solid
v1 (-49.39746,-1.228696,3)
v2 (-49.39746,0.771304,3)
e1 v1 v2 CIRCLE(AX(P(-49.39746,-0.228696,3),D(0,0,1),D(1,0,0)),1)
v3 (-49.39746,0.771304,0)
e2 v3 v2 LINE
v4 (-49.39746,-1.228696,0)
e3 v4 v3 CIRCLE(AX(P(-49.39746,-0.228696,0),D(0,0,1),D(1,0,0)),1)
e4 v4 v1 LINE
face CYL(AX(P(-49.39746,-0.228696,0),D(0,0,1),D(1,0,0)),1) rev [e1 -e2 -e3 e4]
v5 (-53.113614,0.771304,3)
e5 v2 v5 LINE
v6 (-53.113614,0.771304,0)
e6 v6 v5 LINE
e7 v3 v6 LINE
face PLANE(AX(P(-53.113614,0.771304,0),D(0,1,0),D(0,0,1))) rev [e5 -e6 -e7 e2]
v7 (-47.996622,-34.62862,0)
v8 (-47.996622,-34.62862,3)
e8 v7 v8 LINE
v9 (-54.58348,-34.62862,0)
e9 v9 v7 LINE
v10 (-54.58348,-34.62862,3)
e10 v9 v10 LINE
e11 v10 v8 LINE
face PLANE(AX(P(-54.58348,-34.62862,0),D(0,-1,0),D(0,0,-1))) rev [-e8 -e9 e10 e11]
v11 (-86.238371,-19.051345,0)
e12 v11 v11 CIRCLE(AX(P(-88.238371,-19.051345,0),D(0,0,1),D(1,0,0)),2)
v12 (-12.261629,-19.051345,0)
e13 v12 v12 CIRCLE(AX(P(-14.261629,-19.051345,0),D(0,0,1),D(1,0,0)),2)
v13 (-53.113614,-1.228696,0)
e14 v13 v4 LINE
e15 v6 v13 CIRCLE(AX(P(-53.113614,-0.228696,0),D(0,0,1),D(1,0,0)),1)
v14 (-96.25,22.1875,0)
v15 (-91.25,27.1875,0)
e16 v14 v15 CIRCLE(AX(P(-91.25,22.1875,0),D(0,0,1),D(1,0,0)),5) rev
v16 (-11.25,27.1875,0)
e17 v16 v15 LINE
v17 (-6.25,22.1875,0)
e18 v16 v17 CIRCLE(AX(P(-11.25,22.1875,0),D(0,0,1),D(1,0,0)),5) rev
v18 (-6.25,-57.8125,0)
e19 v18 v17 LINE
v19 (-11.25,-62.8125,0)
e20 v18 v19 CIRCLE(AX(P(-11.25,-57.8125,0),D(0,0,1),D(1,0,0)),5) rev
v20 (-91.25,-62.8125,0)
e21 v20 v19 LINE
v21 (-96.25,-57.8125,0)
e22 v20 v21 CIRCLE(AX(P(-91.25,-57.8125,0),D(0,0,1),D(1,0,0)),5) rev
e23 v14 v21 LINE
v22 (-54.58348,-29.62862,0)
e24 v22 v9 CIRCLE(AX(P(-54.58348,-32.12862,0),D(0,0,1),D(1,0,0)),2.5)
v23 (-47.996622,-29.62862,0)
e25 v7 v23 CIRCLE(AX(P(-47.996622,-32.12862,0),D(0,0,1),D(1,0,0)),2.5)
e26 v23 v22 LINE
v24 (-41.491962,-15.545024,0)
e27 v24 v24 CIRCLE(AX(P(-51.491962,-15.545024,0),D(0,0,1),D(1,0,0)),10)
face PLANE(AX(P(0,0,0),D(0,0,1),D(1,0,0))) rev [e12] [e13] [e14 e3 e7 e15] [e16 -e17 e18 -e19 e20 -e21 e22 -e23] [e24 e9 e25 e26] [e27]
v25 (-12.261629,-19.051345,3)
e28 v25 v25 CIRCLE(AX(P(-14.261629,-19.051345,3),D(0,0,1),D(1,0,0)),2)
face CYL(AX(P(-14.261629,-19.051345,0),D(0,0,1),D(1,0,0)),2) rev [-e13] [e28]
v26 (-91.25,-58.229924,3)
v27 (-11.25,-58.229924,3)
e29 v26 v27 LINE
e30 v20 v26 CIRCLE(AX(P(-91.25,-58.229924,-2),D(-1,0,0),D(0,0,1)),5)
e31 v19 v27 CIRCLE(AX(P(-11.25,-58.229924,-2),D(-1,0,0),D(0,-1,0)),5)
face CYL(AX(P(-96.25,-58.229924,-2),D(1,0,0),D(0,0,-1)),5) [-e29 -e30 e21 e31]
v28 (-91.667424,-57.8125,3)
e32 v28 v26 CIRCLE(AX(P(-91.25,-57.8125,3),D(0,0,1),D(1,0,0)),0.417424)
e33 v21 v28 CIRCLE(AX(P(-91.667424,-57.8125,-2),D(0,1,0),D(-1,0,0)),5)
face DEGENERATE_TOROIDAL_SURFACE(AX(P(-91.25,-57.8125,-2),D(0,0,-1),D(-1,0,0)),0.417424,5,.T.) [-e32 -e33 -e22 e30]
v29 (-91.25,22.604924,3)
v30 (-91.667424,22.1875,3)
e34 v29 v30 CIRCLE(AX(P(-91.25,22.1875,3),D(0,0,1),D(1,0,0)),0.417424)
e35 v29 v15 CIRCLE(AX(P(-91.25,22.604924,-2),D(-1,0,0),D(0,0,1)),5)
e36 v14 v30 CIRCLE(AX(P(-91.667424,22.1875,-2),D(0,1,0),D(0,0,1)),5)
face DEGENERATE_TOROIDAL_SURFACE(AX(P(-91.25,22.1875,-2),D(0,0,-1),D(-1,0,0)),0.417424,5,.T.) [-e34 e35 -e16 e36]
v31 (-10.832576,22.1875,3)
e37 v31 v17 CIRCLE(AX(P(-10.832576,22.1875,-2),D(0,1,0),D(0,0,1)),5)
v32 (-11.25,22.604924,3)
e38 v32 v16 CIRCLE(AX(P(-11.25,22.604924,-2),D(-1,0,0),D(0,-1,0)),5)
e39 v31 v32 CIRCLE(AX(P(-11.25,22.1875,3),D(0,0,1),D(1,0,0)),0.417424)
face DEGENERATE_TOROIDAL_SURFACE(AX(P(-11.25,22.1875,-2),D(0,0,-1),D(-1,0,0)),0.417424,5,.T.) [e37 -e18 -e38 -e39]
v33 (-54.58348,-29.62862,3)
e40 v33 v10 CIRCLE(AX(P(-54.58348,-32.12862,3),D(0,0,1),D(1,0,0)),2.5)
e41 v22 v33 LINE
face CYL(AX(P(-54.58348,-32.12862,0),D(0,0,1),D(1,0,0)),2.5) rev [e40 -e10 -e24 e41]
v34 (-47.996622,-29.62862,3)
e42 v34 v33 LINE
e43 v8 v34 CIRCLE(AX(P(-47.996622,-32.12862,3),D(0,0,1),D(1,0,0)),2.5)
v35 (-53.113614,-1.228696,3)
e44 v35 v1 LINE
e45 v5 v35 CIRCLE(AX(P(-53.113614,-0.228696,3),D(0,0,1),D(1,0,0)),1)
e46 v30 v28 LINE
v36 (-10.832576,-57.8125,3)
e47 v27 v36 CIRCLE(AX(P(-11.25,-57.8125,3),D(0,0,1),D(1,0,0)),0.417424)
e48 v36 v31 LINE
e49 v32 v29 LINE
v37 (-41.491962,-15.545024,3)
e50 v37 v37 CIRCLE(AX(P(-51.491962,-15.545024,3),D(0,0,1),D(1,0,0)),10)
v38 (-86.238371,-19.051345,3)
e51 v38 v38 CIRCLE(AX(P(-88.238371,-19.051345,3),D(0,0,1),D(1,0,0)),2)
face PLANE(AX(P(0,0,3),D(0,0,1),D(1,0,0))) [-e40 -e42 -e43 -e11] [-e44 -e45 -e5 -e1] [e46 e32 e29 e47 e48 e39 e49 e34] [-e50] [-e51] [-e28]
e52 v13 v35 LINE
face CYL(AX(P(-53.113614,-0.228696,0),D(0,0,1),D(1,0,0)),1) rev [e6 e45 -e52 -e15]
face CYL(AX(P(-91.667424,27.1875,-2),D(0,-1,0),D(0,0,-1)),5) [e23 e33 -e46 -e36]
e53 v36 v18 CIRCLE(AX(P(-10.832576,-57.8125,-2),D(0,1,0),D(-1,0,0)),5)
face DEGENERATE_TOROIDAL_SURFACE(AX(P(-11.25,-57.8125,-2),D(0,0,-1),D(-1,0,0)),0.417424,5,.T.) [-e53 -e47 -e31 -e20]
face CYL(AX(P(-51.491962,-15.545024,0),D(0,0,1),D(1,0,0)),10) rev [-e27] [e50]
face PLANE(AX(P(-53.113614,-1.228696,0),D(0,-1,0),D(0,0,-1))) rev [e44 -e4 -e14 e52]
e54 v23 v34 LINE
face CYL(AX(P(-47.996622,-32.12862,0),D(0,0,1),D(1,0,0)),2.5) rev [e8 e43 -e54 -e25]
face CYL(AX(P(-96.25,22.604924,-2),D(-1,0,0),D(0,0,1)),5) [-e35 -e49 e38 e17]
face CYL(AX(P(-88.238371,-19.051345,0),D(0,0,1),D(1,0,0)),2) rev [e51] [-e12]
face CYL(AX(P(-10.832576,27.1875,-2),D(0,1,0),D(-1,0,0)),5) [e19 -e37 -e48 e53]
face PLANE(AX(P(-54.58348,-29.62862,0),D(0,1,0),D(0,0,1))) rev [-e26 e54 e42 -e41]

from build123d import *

# Parameters (mm, degrees)
SKETCH1_W           = 90
SKETCH1_H           = 90
BOSS_EXTRUDE1_DEPTH = 3
FILLET1_R           = 5
FILLET3_R           = 5
SKETCH2_R           = 10
SKETCH2_R_2         = 2
CUT_EXTRUDE1_DEPTH  = 3


with BuildPart() as part:
    # Sketch1 → Boss-Extrude1 (new body)
    with BuildSketch(Plane.XY):
        with Locations((-51.25, -17.8125)):
            Rectangle(SKETCH1_W, SKETCH1_H)
    extrude(amount=BOSS_EXTRUDE1_DEPTH)

    # Fillet1
    fillet1_edges = [part.edges().sort_by_distance(p)[0] for p in [
        (-96.25, 27.1875, 1.5),
        (-6.25, 27.1875, 1.5),
        (-6.25, -62.8125, 1.5),
        (-96.25, -62.8125, 1.5),
    ]]
    fillet(fillet1_edges, radius=FILLET1_R)

    # Fillet3
    # the kernel refuses this fillet: 5 mm, written as the material it takes off along each edge
    with BuildSketch(Plane(origin=(-91.25, 22.1875, 3), x_dir=(0, 1, 0), z_dir=(1, 0, 0))) as fillet3_piece_1:
        with BuildLine():
            CenterArc((0.417424305, -5), FILLET3_R, 23.578178478, 66.421821522)
            Line((0.417424305, 0), (0.417424305, 0.1))
            Line((0.417424305, 0.1), (5, 0.1))
            Line((5, 0.1), (5.1, 0))
            ThreePointArc((5.1, 0), (5.1, -1.5), (5.091651514, -2.96))
            Line((5.091651514, -2.96), (5, -3))
        make_face()
    revolve(axis=Axis((-91.25, 22.1875, 3), (0, 0, 1)), revolution_arc=90, mode=Mode.SUBTRACT)
    with BuildSketch(Plane(origin=(-91.25, 27.1875, 3), x_dir=(0, 0, -1), z_dir=(1, 0, 0))) as fillet3_piece_2:
        with BuildLine():
            CenterArc((5, -4.582575695), FILLET3_R, 113.578178478, 66.421821522)
            Line((0, -4.582575695), (-0.1, -4.582575695))
            Line((-0.1, -4.582575695), (-0.1, 0))
            Line((-0.1, 0), (0, 0.1))
            ThreePointArc((0, 0.1), (1.5, 0.1), (2.96, 0.091651514))
            Line((2.96, 0.091651514), (3, 0))
        make_face()
    extrude(amount=80, mode=Mode.SUBTRACT)
    with BuildSketch(Plane(origin=(-11.25, 22.1875, 3), x_dir=(0, 1, 0), z_dir=(-1, 0, 0))) as fillet3_piece_3:
        with BuildLine():
            CenterArc((0.417424305, 5), FILLET3_R, 270, 66.421821522)
            Line((0.417424305, 0), (0.417424305, -0.1))
            Line((0.417424305, -0.1), (5, -0.1))
            Line((5, -0.1), (5.1, 0))
            ThreePointArc((5.1, 0), (5.1, 1.5), (5.091651514, 2.96))
            Line((5.091651514, 2.96), (5, 3))
        make_face()
    revolve(axis=Axis((-11.25, 22.1875, 3), (0, 0, -1)), revolution_arc=90, mode=Mode.SUBTRACT)
    with BuildSketch(Plane(origin=(-6.25, 22.1875, 3), x_dir=(-1, 0, 0), z_dir=(0, -1, 0)), Plane(origin=(-11.25, -62.8125, 3), x_dir=(0, 1, 0), z_dir=(-1, 0, 0)), Plane(origin=(-96.25, -57.8125, 3), x_dir=(1, 0, 0), z_dir=(0, 1, 0))) as fillet3_piece_4:
        with BuildLine():
            CenterArc((4.582575695, 5), FILLET3_R, 203.578178478, 66.421821522)
            Line((0, 3), (-0.091651514, 2.96))
            ThreePointArc((-0.091651514, 2.96), (-0.1, 1.5), (-0.1, 0))
            Line((-0.1, 0), (0, -0.1))
            Line((0, -0.1), (4.582575695, -0.1))
            Line((4.582575695, -0.1), (4.582575695, 0))
        make_face()
    extrude(amount=80, mode=Mode.SUBTRACT)
    with BuildSketch(Plane(origin=(-11.25, -57.8125, 3), x_dir=(1, 0, 0), z_dir=(0, 1, 0))) as fillet3_piece_5:
        with BuildLine():
            CenterArc((0.417424305, 5), FILLET3_R, 270, 66.421821522)
            Line((5, 3), (5.091651514, 2.96))
            ThreePointArc((5.091651514, 2.96), (5.1, 1.5), (5.1, 0))
            Line((5.1, 0), (5, -0.1))
            Line((5, -0.1), (0.417424305, -0.1))
            Line((0.417424305, -0.1), (0.417424305, 0))
        make_face()
    revolve(axis=Axis((-11.25, -57.8125, 3), (0, 0, -1)), revolution_arc=90, mode=Mode.SUBTRACT)
    with BuildSketch(Plane(origin=(-91.25, -57.8125, 3), x_dir=(0, -1, 0), z_dir=(1, 0, 0))) as fillet3_piece_6:
        with BuildLine():
            CenterArc((0.417424305, 5), FILLET3_R, 270, 66.421821522)
            Line((5, 3), (5.091651514, 2.96))
            ThreePointArc((5.091651514, 2.96), (5.1, 1.5), (5.1, 0))
            Line((5.1, 0), (5, -0.1))
            Line((5, -0.1), (0.417424305, -0.1))
            Line((0.417424305, -0.1), (0.417424305, 0))
        make_face()
    revolve(axis=Axis((-91.25, -57.8125, 3), (0, 0, -1)), revolution_arc=90, mode=Mode.SUBTRACT)

    # Sketch2 → Cut-Extrude1 (cut)
    with BuildSketch(Plane.XY.offset(3)):
        with Locations((-51.491961851, -15.545023704)):
            Circle(SKETCH2_R)
        with Locations((-88.238370767, -19.051344954)):
            Circle(SKETCH2_R_2)
        with Locations((-14.261629233, -19.051344954)):
            Circle(SKETCH2_R_2)
        with BuildLine():
            Line((-54.583479712, -29.628619656), (-47.996622456, -29.628619656))
            ThreePointArc((-47.996622456, -29.628619656), (-45.496622456, -32.128619656), (-47.996622456, -34.628619656))
            Line((-47.996622456, -34.628619656), (-54.583479712, -34.628619656))
            ThreePointArc((-54.583479712, -34.628619656), (-57.083479712, -32.128619656), (-54.583479712, -29.628619656))
        make_face()
        with BuildLine():
            Line((-53.113614206, 0.771303592), (-49.397460357, 0.771303592))
            ThreePointArc((-49.397460357, 0.771303592), (-48.397460357, -0.228696408), (-49.397460357, -1.228696408))
            Line((-49.397460357, -1.228696408), (-53.113614206, -1.228696408))
            ThreePointArc((-53.113614206, -1.228696408), (-54.113614206, -0.228696408), (-53.113614206, 0.771303592))
        make_face()
    extrude(amount=-CUT_EXTRUDE1_DEPTH, mode=Mode.SUBTRACT)


solid = part.part
